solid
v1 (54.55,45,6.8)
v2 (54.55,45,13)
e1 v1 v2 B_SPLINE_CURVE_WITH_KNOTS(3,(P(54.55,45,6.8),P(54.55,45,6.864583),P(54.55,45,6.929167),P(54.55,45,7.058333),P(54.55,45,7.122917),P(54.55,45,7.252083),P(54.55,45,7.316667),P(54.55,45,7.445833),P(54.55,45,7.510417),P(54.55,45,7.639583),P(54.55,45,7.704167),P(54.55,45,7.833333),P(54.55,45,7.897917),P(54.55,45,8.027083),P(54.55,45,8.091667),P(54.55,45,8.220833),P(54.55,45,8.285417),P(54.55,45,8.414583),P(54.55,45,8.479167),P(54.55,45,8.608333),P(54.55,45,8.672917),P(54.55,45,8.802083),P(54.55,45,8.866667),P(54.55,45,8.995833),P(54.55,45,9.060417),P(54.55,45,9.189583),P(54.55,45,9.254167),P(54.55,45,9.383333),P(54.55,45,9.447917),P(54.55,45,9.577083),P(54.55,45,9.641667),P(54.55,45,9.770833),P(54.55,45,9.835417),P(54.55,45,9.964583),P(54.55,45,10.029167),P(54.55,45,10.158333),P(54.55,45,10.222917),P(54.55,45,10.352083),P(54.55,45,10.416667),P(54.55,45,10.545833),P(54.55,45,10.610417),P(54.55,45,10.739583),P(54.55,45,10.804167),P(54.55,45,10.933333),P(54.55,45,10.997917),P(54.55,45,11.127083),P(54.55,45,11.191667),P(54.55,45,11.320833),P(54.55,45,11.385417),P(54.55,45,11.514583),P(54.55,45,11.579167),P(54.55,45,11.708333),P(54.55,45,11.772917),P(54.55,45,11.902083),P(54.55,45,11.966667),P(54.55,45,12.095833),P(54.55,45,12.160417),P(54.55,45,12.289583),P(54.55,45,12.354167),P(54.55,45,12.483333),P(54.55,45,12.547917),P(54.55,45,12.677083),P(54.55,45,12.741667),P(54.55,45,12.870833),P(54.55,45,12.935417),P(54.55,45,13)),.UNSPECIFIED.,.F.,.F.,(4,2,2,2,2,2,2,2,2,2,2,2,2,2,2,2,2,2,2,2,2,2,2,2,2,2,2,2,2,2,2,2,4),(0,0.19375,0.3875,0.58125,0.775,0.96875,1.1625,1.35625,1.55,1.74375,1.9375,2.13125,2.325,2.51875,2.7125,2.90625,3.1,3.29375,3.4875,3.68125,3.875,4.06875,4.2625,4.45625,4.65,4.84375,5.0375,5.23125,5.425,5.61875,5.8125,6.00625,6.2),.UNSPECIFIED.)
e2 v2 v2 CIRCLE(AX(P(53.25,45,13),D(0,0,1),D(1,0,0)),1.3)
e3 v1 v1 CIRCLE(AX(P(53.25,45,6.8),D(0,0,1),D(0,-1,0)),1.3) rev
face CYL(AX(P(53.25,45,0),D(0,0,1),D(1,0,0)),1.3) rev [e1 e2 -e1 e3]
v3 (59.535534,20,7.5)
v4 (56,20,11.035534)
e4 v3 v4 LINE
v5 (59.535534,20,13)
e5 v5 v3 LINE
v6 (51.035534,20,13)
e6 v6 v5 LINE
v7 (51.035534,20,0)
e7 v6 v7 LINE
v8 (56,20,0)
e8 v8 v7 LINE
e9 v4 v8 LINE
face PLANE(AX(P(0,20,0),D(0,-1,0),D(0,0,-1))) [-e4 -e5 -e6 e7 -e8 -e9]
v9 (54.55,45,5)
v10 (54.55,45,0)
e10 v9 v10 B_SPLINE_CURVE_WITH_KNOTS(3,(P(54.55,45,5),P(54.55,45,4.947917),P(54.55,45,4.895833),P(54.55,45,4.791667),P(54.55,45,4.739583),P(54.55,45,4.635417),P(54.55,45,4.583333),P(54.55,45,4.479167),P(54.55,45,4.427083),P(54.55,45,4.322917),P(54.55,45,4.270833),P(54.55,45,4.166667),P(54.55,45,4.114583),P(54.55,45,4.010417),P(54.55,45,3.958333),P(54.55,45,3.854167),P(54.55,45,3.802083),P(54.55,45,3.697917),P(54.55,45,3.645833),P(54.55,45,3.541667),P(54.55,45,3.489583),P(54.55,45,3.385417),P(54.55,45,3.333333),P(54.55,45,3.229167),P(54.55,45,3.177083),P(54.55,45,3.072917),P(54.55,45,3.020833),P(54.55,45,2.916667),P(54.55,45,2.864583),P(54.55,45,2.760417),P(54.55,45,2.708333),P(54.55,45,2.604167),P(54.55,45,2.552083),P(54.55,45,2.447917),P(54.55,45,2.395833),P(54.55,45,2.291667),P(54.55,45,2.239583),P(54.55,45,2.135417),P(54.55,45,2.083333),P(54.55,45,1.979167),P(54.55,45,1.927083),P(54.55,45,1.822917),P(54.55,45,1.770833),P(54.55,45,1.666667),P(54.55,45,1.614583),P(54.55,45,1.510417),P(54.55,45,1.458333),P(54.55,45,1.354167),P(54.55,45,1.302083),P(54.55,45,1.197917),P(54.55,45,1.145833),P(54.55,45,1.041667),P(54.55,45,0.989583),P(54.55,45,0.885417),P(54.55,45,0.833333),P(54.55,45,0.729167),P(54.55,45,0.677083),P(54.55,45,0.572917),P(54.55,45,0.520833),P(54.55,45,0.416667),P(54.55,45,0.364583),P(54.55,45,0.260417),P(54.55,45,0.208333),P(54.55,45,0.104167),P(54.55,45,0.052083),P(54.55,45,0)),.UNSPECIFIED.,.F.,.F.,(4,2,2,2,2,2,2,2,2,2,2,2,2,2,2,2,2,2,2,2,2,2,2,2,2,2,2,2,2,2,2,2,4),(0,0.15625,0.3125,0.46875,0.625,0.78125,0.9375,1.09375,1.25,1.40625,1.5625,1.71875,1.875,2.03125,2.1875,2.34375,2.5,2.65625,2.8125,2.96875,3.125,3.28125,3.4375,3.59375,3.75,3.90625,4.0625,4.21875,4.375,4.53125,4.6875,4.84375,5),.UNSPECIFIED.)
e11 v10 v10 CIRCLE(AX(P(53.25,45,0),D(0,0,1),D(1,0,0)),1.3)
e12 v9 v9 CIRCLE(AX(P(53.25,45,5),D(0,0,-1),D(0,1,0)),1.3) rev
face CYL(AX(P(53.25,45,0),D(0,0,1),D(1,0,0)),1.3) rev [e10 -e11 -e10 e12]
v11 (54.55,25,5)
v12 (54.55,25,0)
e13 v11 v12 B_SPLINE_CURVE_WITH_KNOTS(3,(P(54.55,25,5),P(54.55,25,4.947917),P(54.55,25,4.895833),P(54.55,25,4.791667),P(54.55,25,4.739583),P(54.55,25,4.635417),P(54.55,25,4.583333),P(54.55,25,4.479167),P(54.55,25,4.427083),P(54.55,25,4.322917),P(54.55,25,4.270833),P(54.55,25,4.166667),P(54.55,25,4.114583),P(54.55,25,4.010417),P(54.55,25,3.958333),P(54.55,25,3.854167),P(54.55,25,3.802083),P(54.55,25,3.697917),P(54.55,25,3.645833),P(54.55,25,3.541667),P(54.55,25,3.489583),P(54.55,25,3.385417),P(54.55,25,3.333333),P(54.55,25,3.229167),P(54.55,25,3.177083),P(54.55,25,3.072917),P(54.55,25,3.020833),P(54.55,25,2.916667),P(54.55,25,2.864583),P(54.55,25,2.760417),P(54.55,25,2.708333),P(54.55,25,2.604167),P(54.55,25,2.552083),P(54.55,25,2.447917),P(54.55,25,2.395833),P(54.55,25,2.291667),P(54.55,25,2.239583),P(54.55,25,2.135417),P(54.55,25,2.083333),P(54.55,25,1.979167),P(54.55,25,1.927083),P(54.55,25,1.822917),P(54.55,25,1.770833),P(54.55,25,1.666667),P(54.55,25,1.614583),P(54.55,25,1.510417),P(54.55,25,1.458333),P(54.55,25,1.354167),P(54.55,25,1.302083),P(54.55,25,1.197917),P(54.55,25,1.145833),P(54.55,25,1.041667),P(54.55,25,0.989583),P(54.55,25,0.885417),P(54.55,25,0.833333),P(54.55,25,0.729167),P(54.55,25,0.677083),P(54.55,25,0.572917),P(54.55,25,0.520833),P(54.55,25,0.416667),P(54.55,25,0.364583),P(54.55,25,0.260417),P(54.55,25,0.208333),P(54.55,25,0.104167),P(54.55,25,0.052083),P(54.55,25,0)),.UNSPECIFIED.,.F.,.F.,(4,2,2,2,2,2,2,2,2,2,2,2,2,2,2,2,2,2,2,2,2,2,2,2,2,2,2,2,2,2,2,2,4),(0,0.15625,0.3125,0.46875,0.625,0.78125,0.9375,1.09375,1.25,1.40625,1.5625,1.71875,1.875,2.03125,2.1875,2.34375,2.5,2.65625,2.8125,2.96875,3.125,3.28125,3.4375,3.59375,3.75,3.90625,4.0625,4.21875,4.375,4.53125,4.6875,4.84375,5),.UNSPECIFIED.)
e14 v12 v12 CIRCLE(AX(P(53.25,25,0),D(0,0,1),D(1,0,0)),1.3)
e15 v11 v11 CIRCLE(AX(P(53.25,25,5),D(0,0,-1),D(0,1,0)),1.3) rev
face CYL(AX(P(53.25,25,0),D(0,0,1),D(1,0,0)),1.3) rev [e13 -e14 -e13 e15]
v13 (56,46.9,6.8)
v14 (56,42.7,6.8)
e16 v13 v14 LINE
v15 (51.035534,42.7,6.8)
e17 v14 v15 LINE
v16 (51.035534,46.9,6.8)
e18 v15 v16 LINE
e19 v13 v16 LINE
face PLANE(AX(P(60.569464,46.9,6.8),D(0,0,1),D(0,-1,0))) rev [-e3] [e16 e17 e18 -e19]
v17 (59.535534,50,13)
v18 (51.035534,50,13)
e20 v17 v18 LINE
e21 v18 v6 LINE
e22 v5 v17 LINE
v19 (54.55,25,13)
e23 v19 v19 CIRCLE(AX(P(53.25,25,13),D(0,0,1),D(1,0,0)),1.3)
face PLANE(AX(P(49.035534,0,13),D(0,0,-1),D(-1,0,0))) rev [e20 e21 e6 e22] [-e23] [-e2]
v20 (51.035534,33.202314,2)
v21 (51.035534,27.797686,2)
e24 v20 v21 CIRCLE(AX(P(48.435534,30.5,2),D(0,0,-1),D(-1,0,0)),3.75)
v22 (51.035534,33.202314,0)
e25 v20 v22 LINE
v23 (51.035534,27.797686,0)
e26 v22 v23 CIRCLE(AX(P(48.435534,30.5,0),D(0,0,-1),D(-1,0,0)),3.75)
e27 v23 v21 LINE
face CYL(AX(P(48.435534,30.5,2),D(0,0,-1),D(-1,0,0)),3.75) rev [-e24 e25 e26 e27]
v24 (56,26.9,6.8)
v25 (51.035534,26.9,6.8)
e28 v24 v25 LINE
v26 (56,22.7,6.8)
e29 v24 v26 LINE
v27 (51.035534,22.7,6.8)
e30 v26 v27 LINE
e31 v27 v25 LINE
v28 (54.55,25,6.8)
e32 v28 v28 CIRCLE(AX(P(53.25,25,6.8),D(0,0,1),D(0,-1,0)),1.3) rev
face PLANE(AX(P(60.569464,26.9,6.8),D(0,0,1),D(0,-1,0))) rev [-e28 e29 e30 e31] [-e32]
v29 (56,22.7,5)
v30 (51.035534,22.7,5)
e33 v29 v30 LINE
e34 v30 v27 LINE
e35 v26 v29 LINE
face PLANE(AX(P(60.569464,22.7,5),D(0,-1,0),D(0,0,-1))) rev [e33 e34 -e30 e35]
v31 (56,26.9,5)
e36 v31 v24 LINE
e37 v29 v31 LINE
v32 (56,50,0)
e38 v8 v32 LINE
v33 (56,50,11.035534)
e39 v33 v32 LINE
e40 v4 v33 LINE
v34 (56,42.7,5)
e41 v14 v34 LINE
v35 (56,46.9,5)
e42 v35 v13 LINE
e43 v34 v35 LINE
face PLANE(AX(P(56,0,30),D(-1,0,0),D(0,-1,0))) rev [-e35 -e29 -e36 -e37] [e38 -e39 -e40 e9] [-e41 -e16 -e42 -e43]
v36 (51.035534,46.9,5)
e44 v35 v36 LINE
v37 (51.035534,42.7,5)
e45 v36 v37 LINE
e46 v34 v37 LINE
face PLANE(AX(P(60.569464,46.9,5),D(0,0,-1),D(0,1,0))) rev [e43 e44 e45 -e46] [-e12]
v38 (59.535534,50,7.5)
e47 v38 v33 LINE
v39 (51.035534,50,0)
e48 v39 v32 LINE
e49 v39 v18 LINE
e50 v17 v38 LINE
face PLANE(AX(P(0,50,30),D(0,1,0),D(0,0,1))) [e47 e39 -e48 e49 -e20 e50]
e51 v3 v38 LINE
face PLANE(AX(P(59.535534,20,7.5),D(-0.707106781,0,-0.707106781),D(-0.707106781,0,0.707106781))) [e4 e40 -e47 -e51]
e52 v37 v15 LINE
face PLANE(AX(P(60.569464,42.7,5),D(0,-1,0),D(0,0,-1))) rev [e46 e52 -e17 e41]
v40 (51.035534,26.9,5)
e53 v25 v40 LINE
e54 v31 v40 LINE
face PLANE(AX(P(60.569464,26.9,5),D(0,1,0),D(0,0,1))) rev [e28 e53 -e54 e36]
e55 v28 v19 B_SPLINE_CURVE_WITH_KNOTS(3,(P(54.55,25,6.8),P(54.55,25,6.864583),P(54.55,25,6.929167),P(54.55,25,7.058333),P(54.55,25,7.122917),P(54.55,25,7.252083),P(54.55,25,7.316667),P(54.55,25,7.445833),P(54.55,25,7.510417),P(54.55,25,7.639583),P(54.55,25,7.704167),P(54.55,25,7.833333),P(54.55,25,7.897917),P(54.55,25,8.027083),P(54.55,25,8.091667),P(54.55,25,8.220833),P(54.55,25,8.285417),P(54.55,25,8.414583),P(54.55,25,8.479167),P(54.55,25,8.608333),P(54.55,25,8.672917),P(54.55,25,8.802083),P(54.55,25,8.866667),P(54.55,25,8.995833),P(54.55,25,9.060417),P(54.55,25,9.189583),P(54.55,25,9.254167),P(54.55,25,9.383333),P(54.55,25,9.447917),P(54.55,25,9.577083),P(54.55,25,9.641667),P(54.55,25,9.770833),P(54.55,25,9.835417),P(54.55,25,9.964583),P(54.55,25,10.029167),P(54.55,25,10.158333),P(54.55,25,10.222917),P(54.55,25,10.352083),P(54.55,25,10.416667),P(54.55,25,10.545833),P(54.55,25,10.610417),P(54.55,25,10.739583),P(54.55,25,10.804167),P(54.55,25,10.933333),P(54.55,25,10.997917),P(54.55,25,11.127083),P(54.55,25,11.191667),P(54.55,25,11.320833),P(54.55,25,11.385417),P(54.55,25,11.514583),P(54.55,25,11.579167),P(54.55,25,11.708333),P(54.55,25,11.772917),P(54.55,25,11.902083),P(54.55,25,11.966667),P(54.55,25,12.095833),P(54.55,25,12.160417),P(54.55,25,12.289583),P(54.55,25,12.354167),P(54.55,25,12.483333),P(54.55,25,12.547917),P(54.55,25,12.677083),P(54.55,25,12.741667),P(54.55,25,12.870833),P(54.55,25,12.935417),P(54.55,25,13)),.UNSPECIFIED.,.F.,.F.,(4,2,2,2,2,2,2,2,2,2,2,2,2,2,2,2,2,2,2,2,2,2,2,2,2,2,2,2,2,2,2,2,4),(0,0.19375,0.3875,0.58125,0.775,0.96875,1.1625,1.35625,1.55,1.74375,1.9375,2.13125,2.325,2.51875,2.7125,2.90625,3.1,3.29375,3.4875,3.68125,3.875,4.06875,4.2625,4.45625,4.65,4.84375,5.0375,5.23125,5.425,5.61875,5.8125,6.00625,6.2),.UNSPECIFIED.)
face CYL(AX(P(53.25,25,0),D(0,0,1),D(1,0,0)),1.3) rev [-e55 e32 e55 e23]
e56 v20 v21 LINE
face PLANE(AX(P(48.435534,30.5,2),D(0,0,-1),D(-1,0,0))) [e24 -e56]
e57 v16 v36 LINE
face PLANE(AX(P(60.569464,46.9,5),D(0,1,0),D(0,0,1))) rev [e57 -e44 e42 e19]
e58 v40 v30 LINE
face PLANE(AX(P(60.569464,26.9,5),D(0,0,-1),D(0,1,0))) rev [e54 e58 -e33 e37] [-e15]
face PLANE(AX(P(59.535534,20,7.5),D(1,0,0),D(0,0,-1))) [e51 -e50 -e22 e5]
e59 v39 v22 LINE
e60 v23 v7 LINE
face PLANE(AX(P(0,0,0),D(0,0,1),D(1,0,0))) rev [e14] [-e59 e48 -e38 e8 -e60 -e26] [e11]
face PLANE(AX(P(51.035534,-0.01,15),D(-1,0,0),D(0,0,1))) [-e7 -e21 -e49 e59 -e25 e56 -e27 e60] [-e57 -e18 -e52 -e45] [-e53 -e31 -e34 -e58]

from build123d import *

# Parameters (mm, degrees)
STOCK_NOZZLE4_1_OUTLINE_W = 4.964466094
STOCK_NOZZLE4_1_OUTLINE_H = 15
STOCK_NOZZLE4_1_DEPTH     = 50
STOCK_NOZZLE4_1_START     = 20
STOCK_NOZZLE4_1_2_DEPTH   = 30
SKETCH1_W                 = 20
SKETCH1_H                 = 2
CUT_EXTRUDE1_DEPTH        = 80.180046713
SKETCH2_W                 = 11.16019391
SKETCH2_H                 = 20
CUT_EXTRUDE2_DEPTH        = 79.825629065
SKETCH6_R                 = 1.3
CUT_EXTRUDE3_DEPTH        = 79.825629065
SKETCH7_W                 = 1.8
SKETCH7_H                 = 4.2
CUT_EXTRUDE4_DEPTH        = 4.964466094
SKETCH8_R                 = 3.75
CUT_EXTRUDE5_DEPTH        = 2


# Read off the part's stored shape, not the designer's step: Stock-nozzle4-1
with BuildPart() as part:
    # Stock-nozzle4-1 outline → Stock-nozzle4-1 (new body)
    with BuildSketch(Plane(origin=(0, 0, 0), x_dir=(1, 0, 0), z_dir=(0, 1, 0))):
        with Locations((53.517766953, -7.5)):
            Rectangle(STOCK_NOZZLE4_1_OUTLINE_W, STOCK_NOZZLE4_1_OUTLINE_H)
    extrude(amount=STOCK_NOZZLE4_1_DEPTH)

    # Stock-nozzle4-1 2 outline → Stock-nozzle4-1 2 (add)
    with BuildSketch(Plane(origin=(0, 0, 0), x_dir=(1, 0, 0), z_dir=(0, 1, 0)).offset(STOCK_NOZZLE4_1_START)):
        Polygon((56, -11.035533906), (56, -15), (59.535533906, -15), (59.535533906, -7.5), align=None)
    extrude(amount=STOCK_NOZZLE4_1_2_DEPTH)

    # Sketch1 → Cut-Extrude1 (cut, through all)
    with BuildSketch(Plane(origin=(0, 50, 0), x_dir=(1, 0, 0), z_dir=(0, 1, 0))):
        with Locations((59.035533906, -14)):
            Rectangle(SKETCH1_W, SKETCH1_H)
    extrude(amount=-CUT_EXTRUDE1_DEPTH, mode=Mode.SUBTRACT)

    # Sketch2 → Cut-Extrude2 (cut, through all)
    with BuildSketch(Plane.XY.offset(13)):
        with Locations((56.580096955, 10)):
            Rectangle(SKETCH2_W, SKETCH2_H)
    extrude(amount=-CUT_EXTRUDE2_DEPTH, mode=Mode.SUBTRACT)

    # Sketch6 → Cut-Extrude3 (cut, through all)
    with BuildSketch(Plane.XY.offset(13)):
        with Locations((53.25, 45)):
            Circle(SKETCH6_R)
        with Locations((53.25, 25)):
            Circle(SKETCH6_R)
    extrude(amount=-CUT_EXTRUDE3_DEPTH, mode=Mode.SUBTRACT)

    # Sketch7 → Cut-Extrude4 (cut)
    with BuildSketch(Plane.ZY.offset(-51.035533906)):
        with Locations((5.9, 44.8)):
            Rectangle(SKETCH7_W, SKETCH7_H)
        with Locations((5.9, 24.8)):
            Rectangle(SKETCH7_W, SKETCH7_H)
    extrude(amount=-CUT_EXTRUDE4_DEPTH, mode=Mode.SUBTRACT)

    # Sketch8 → Cut-Extrude5 (cut)
    with BuildSketch(Plane(origin=(0, 0, 0), x_dir=(-1, 0, 0), z_dir=(0, 0, -1))):
        with Locations((-48.435533906, 30.5)):
            Circle(SKETCH8_R)
    extrude(amount=-CUT_EXTRUDE5_DEPTH, mode=Mode.SUBTRACT)


solid = part.part
